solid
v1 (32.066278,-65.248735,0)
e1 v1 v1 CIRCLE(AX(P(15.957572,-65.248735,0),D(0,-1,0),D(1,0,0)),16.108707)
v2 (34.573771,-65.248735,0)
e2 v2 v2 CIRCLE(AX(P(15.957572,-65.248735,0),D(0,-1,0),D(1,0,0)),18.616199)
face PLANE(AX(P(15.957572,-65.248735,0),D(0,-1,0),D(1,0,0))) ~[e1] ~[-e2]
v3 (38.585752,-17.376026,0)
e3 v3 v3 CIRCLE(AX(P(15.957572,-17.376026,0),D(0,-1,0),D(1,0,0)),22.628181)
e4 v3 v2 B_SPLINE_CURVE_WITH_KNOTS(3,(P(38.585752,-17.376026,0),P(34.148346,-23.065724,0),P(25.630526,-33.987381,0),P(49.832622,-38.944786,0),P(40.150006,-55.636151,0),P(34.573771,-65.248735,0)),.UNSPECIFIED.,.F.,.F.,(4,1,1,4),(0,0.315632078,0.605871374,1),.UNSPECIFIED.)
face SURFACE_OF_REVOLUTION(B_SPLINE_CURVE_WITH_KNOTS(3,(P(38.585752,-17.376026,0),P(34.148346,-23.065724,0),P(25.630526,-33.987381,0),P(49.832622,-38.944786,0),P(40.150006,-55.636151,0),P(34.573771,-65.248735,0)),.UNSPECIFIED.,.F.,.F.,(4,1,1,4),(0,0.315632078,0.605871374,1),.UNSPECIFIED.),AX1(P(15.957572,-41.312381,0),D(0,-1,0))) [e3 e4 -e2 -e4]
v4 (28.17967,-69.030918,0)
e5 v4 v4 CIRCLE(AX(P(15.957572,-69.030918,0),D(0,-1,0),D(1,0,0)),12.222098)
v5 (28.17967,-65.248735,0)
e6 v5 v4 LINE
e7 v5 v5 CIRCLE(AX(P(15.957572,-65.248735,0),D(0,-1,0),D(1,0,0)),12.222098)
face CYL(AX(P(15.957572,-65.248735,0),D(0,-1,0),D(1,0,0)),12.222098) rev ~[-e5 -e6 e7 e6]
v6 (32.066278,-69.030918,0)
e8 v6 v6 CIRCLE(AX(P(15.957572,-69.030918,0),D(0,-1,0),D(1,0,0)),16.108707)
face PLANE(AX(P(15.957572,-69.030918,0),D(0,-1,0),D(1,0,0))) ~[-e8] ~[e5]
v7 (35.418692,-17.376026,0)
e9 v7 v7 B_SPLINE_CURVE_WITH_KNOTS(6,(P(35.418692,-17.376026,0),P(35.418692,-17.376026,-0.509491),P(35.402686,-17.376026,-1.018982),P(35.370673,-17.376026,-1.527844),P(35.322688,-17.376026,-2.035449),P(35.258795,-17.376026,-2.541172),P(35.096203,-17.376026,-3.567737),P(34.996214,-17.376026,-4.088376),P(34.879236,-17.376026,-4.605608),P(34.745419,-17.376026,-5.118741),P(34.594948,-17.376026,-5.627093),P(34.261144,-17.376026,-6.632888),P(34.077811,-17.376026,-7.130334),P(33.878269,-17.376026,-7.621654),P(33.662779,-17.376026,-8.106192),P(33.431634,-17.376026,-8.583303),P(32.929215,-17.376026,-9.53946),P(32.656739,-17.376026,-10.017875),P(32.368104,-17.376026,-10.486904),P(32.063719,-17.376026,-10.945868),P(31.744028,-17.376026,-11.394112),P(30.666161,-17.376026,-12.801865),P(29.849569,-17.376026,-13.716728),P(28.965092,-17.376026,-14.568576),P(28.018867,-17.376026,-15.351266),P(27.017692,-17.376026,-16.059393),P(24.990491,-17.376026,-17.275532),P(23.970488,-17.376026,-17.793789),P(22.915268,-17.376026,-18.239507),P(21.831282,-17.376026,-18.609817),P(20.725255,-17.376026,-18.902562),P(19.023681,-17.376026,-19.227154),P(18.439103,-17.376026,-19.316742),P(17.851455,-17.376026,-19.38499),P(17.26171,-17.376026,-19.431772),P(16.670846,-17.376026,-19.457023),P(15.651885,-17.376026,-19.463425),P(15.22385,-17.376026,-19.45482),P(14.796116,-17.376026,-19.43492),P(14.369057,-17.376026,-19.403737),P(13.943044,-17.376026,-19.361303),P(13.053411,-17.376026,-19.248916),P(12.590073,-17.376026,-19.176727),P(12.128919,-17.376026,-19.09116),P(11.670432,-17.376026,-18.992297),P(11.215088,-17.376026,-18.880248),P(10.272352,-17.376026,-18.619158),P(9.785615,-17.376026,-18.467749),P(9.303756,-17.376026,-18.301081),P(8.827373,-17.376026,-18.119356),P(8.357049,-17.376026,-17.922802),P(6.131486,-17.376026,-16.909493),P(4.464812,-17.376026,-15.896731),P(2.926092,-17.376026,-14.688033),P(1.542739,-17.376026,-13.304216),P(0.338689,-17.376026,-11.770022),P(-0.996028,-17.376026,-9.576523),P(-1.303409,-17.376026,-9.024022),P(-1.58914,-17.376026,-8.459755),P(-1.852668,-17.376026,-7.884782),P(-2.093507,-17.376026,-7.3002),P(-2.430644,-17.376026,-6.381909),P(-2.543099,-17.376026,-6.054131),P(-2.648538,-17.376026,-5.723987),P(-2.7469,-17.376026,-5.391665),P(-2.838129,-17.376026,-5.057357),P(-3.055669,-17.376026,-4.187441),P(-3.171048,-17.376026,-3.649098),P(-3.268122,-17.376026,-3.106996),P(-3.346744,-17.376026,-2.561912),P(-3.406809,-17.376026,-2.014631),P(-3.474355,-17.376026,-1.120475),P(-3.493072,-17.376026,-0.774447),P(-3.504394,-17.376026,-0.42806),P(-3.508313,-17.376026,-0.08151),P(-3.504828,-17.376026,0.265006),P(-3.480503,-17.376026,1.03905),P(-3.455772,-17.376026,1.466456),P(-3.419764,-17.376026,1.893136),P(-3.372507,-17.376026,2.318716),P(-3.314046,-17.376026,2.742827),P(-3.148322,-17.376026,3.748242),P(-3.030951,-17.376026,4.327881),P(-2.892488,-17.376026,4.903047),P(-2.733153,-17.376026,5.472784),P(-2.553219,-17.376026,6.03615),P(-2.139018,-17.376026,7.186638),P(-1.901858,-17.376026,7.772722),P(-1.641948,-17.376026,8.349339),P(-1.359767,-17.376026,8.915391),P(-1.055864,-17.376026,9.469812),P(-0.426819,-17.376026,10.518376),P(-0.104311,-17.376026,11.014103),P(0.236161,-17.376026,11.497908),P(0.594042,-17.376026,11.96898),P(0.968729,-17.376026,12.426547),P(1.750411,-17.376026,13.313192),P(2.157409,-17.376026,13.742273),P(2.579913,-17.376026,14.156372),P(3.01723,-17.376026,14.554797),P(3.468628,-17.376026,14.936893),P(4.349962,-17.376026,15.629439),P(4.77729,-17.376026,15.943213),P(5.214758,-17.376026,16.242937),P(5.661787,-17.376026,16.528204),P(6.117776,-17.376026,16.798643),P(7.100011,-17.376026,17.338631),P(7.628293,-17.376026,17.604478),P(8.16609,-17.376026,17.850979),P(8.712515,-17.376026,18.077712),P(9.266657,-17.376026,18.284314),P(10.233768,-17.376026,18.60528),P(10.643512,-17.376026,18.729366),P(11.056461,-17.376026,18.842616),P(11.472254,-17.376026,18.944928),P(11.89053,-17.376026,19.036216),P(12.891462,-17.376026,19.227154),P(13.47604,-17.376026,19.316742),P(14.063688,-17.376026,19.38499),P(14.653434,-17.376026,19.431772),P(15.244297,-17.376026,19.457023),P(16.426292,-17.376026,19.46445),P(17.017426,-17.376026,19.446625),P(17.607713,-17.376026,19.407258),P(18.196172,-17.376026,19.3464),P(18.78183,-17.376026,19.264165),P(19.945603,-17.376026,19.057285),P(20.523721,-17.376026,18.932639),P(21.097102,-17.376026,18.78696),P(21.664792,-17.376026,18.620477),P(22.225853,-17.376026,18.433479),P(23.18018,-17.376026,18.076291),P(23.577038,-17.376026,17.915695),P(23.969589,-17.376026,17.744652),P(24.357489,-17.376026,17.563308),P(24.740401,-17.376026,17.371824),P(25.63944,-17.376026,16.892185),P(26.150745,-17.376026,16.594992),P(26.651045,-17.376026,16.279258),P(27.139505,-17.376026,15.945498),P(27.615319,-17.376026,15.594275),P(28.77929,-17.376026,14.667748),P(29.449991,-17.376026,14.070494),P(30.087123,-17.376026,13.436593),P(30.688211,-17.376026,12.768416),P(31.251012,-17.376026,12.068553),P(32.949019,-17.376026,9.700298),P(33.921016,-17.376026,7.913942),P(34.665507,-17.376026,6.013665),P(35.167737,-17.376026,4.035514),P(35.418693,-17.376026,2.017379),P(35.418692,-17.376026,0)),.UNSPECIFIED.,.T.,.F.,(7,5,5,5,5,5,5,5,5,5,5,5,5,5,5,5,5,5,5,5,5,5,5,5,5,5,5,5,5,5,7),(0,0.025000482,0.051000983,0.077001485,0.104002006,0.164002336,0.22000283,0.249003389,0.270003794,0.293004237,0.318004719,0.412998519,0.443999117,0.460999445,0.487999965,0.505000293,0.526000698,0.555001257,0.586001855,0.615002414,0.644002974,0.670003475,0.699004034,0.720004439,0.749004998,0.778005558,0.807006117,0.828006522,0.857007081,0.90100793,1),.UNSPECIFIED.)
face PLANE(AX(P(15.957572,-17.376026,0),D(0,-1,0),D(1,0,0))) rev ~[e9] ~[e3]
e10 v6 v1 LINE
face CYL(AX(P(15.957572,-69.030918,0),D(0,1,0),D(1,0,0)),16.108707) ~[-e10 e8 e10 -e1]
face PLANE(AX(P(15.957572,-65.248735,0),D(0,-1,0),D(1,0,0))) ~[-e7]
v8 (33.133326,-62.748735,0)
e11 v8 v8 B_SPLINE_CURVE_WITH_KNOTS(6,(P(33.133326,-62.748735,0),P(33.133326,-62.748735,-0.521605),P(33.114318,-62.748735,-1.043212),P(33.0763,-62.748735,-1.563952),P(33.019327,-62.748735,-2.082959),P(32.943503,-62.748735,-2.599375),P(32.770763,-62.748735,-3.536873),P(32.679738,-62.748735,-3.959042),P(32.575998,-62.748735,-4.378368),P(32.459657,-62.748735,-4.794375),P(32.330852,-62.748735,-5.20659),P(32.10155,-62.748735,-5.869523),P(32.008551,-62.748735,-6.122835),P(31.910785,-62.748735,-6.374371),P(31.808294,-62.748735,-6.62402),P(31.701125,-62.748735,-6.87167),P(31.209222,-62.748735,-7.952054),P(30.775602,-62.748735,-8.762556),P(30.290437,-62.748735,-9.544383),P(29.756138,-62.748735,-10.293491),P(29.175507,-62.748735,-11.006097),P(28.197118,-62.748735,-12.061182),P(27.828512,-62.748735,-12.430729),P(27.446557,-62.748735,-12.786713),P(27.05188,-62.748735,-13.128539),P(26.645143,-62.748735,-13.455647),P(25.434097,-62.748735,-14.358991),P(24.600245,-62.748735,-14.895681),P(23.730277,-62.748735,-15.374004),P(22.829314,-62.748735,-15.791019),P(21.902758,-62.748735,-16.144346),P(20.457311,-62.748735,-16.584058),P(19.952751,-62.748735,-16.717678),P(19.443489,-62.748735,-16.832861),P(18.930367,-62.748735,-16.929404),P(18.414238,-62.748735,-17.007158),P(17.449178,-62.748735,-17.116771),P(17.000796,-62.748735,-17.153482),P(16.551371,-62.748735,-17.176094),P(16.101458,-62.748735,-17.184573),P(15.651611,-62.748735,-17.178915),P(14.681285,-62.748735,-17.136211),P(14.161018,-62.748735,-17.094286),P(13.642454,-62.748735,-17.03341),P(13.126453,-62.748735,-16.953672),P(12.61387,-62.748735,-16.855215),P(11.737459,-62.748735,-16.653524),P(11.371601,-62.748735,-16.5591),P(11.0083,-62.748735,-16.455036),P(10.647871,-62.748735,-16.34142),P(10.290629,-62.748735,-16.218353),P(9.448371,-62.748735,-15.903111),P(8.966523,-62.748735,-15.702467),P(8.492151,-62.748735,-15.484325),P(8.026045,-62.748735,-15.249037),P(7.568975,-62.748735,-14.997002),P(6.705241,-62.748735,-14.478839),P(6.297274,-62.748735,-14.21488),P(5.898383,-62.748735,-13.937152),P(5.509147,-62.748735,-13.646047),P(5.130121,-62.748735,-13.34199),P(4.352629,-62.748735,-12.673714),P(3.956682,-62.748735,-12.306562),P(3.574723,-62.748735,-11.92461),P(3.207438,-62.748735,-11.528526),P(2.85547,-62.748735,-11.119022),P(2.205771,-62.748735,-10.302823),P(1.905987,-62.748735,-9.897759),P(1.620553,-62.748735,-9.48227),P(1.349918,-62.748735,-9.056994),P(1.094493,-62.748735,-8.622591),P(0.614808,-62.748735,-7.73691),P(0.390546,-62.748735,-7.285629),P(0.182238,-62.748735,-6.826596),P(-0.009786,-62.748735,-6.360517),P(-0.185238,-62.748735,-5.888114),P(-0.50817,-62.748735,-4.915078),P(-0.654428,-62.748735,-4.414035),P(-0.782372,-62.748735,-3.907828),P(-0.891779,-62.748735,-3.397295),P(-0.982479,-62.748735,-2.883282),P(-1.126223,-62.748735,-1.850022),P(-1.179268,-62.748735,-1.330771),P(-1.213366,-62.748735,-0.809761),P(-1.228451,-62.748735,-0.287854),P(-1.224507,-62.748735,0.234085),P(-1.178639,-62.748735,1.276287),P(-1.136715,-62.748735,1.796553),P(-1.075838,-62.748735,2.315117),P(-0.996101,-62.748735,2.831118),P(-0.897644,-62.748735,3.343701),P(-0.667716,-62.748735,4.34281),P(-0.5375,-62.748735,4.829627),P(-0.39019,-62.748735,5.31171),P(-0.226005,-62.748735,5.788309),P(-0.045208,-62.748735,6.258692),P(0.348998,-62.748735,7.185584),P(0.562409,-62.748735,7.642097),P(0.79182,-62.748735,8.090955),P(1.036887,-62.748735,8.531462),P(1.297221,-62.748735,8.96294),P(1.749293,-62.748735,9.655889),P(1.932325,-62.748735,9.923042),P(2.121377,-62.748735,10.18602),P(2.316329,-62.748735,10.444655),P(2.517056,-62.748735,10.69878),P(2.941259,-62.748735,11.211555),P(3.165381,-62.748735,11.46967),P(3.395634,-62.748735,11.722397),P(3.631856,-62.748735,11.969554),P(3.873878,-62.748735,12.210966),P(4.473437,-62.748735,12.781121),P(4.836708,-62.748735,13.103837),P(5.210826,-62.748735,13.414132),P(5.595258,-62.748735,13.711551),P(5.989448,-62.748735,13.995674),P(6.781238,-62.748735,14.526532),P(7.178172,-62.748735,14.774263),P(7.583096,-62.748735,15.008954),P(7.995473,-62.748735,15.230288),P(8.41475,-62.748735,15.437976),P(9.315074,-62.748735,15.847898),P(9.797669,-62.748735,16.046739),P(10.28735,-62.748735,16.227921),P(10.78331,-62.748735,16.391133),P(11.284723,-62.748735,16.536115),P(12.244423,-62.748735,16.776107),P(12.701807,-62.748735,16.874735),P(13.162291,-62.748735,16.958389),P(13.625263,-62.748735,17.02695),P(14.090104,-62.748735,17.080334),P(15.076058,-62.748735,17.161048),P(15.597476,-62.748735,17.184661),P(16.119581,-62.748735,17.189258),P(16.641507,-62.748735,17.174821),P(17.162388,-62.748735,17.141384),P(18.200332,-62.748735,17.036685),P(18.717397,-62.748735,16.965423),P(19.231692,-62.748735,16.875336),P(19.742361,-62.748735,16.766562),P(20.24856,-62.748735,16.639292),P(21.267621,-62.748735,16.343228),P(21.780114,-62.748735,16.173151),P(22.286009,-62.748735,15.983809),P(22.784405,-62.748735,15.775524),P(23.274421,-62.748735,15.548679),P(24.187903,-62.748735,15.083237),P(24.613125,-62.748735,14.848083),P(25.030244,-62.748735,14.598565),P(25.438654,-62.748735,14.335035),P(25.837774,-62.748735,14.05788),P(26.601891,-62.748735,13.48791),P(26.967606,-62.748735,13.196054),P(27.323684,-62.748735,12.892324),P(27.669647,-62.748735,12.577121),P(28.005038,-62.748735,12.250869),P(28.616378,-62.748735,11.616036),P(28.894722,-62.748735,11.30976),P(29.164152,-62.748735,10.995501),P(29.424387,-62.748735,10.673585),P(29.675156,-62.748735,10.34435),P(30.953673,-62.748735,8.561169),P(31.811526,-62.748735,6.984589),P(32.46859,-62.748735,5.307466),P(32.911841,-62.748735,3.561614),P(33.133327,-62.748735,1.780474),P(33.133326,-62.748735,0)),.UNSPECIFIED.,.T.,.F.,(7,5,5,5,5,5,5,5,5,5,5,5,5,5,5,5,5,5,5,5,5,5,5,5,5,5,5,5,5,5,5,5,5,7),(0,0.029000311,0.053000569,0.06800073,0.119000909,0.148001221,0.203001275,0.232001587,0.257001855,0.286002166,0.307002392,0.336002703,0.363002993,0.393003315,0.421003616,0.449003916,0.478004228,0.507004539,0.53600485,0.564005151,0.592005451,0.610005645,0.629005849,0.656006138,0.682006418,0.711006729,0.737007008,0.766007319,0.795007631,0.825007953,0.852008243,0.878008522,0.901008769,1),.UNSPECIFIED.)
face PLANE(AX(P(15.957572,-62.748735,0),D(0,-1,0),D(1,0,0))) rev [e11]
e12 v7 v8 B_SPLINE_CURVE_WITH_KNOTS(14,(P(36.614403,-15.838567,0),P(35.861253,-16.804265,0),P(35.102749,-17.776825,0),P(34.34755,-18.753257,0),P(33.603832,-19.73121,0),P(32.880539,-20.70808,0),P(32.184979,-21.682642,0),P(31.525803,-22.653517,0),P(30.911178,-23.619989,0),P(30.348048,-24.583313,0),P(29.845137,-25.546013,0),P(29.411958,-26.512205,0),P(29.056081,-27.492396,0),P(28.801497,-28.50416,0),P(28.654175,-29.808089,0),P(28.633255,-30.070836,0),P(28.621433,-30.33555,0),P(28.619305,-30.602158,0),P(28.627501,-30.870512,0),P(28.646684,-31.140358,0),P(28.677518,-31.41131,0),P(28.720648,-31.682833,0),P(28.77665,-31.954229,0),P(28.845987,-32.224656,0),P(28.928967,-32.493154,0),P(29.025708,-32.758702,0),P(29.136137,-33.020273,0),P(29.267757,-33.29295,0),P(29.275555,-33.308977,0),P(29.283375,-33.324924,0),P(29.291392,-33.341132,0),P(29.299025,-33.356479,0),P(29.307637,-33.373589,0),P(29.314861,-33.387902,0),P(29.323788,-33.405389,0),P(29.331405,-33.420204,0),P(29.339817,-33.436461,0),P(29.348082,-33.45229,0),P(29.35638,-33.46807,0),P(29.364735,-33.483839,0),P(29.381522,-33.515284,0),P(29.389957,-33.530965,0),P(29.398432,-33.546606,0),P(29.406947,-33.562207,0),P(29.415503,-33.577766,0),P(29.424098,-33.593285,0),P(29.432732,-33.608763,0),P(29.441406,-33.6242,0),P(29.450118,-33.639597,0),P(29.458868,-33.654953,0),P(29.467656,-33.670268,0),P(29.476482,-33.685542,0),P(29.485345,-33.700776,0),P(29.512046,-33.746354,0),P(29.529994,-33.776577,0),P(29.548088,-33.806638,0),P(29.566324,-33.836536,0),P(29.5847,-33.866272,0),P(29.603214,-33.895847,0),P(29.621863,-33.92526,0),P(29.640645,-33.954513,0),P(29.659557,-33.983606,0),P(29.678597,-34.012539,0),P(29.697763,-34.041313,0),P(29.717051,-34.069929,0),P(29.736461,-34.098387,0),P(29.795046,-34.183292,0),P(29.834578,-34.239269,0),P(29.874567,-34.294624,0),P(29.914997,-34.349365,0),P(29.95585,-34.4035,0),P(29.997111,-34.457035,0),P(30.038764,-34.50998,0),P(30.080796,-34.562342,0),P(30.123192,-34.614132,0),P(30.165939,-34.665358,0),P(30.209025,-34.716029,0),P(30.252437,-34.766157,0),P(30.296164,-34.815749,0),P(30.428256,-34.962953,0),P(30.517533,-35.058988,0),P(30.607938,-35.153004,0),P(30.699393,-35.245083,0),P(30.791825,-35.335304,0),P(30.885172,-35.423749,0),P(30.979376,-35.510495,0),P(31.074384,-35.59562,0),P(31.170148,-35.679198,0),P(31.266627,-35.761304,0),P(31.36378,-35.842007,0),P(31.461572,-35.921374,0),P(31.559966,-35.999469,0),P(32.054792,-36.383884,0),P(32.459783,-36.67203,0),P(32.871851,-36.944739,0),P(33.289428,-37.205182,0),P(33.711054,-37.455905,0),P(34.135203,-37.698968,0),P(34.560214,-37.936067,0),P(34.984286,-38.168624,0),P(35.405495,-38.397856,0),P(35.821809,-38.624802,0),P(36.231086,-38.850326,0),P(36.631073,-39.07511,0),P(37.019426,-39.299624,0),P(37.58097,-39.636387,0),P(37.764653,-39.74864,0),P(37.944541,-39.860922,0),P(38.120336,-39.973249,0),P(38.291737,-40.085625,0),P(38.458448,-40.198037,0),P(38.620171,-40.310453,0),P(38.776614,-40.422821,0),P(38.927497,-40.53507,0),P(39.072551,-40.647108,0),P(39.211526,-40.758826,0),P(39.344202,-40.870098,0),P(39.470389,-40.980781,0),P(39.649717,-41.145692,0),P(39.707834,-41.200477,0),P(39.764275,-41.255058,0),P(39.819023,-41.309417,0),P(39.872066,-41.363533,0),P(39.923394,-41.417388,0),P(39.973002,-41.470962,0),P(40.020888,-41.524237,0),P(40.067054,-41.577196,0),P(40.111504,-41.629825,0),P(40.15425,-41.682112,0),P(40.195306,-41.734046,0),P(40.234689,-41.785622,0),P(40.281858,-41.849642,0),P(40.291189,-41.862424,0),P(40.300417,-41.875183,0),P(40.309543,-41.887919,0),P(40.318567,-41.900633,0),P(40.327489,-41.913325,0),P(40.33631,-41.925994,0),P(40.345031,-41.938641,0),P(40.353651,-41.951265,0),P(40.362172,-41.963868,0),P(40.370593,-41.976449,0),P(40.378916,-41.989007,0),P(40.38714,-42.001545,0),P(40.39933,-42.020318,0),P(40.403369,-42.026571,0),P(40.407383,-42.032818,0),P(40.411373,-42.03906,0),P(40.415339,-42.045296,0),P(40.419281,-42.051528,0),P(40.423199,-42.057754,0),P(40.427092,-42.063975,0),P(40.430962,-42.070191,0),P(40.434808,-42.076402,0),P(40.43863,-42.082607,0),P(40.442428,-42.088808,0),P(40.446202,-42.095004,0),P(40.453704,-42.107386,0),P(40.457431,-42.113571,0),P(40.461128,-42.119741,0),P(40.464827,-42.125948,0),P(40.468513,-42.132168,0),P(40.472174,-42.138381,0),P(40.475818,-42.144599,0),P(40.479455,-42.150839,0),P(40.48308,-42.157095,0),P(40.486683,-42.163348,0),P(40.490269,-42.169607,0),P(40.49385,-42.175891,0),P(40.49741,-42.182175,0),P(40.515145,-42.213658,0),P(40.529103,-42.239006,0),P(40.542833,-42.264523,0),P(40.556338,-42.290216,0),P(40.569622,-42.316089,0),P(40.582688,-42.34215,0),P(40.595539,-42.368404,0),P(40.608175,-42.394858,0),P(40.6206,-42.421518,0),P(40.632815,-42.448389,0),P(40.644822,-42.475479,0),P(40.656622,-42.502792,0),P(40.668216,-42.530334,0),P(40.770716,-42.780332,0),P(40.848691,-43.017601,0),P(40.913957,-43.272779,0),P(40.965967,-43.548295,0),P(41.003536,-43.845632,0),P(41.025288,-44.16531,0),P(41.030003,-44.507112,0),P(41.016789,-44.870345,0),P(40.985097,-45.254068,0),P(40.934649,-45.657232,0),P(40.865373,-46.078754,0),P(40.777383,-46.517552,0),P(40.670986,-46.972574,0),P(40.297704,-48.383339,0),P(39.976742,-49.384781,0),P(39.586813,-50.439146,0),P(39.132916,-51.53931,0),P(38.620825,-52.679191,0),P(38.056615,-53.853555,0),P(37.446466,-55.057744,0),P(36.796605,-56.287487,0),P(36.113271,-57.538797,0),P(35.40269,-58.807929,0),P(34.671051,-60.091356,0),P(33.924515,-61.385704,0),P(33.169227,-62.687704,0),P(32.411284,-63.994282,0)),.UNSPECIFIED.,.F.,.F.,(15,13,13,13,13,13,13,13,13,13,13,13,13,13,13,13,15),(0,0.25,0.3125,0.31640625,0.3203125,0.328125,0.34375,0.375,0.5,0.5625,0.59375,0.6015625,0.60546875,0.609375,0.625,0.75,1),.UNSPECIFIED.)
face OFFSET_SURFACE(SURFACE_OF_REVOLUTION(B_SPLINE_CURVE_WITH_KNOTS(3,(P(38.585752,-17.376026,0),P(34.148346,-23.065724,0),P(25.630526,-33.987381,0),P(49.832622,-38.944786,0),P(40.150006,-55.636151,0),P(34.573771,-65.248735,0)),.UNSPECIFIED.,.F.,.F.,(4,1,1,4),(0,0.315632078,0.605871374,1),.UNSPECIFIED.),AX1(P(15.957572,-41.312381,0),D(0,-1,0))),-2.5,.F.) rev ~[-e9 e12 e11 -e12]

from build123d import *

# Parameters (mm, degrees)
F2_T = 2.5


# Not quite as in the source:
# - a shell that OpenCascade refuses in one call is made with other operations: the cavity is built on its own and cut out


with BuildPart() as f1:
    # F0 (on Top) → F1 (revolve)
    with BuildSketch(Plane.XY):
        with BuildLine():
            Line((38.5857522488, -17.3760261387), (15.9575715661, -17.3760261387))
            Line((15.9575715661, -17.3760261387), (15.9575715661, -65.248735249))
            Line((15.9575715661, -65.248735249), (28.1796697527, -65.248735249))
            Line((28.1796697527, -65.248735249), (28.1796697527, -69.0309181809))
            Line((28.1796697527, -69.0309181809), (32.0662781596, -69.0309181809))
            Line((32.0662781596, -69.0309181809), (32.0662781596, -65.248735249))
            Line((32.0662781596, -65.248735249), (34.5737710595, -65.248735249))
            add(Edge.make_bspline(
                [(38.5857522488, -17.3760261387), (34.1483461344, -23.0657243016), (25.6305257678, -33.9873811535), (49.8326224619, -38.9447863561), (40.1500059988, -55.6361507242), (34.5737710595, -65.248735249)],
                knots=[0, 0, 0, 0, 0.3156320779, 0.6058713744, 1, 1, 1, 1], degree=3))
        make_face()
    revolve(axis=Axis((15.9575715661, -41.3123806939, 0), (0, -1, 0)))

    # F2: shell of thickness 2.5, made by hand


with BuildPart() as f2_core1:
    # F2_t2: copy of F1
    add(f1.part)

    # the walls: a layer under each face that stays
    f2_faces = [f2_core1.faces().sort_by_distance(p)[0] for p in [
        (15.9575715661, -65.248735249, 0),
        (3.7354733795, -67.139826715, 0),
        (26.6967092951, -69.0309181809, -10.739137729),
        (-0.1511350274, -67.139826715, 0),
        (28.3683712284, -65.248735249, -12.4107996623),
        (-6.7644266642, -37.3801254436, 0),
    ]]
    thicken(f2_faces, amount=-F2_T, mode=Mode.SUBTRACT)

    # F2_s3 → F2_t4 (revolve, cut)
    with BuildSketch(Plane.XY):
        Polygon((28.1546697527, -65.273735249), (28.1796697527, -62.748735249), (30.6796697527, -62.748735249), (30.6796697527, -65.248735249), align=None)
    revolve(axis=Axis((15.9575715661, -65.248735249, 0), (0, -1, 0)), mode=Mode.SUBTRACT)

    # F2_s5 → F2_t6 (revolve, cut)
    with BuildSketch(Plane.XY):
        Polygon((32.0912781596, -65.273735249), (29.5662781596, -65.248735249), (29.5662781596, -62.748735249), (32.0662781596, -62.748735249), align=None)
    revolve(axis=Axis((15.9575715661, -65.248735249, 0), (0, -1, 0)), mode=Mode.SUBTRACT)


with BuildPart() as f1_1:
    add(f1.part)

    # what is left inside the walls is the cavity
    f2_cavity = [f2_core1.part.solids().sort_by_distance(p)[0] for p in [
        (1.483034, -35.002243, 0),
    ]]
    add(f2_cavity, mode=Mode.SUBTRACT)


solid = f1_1.part
